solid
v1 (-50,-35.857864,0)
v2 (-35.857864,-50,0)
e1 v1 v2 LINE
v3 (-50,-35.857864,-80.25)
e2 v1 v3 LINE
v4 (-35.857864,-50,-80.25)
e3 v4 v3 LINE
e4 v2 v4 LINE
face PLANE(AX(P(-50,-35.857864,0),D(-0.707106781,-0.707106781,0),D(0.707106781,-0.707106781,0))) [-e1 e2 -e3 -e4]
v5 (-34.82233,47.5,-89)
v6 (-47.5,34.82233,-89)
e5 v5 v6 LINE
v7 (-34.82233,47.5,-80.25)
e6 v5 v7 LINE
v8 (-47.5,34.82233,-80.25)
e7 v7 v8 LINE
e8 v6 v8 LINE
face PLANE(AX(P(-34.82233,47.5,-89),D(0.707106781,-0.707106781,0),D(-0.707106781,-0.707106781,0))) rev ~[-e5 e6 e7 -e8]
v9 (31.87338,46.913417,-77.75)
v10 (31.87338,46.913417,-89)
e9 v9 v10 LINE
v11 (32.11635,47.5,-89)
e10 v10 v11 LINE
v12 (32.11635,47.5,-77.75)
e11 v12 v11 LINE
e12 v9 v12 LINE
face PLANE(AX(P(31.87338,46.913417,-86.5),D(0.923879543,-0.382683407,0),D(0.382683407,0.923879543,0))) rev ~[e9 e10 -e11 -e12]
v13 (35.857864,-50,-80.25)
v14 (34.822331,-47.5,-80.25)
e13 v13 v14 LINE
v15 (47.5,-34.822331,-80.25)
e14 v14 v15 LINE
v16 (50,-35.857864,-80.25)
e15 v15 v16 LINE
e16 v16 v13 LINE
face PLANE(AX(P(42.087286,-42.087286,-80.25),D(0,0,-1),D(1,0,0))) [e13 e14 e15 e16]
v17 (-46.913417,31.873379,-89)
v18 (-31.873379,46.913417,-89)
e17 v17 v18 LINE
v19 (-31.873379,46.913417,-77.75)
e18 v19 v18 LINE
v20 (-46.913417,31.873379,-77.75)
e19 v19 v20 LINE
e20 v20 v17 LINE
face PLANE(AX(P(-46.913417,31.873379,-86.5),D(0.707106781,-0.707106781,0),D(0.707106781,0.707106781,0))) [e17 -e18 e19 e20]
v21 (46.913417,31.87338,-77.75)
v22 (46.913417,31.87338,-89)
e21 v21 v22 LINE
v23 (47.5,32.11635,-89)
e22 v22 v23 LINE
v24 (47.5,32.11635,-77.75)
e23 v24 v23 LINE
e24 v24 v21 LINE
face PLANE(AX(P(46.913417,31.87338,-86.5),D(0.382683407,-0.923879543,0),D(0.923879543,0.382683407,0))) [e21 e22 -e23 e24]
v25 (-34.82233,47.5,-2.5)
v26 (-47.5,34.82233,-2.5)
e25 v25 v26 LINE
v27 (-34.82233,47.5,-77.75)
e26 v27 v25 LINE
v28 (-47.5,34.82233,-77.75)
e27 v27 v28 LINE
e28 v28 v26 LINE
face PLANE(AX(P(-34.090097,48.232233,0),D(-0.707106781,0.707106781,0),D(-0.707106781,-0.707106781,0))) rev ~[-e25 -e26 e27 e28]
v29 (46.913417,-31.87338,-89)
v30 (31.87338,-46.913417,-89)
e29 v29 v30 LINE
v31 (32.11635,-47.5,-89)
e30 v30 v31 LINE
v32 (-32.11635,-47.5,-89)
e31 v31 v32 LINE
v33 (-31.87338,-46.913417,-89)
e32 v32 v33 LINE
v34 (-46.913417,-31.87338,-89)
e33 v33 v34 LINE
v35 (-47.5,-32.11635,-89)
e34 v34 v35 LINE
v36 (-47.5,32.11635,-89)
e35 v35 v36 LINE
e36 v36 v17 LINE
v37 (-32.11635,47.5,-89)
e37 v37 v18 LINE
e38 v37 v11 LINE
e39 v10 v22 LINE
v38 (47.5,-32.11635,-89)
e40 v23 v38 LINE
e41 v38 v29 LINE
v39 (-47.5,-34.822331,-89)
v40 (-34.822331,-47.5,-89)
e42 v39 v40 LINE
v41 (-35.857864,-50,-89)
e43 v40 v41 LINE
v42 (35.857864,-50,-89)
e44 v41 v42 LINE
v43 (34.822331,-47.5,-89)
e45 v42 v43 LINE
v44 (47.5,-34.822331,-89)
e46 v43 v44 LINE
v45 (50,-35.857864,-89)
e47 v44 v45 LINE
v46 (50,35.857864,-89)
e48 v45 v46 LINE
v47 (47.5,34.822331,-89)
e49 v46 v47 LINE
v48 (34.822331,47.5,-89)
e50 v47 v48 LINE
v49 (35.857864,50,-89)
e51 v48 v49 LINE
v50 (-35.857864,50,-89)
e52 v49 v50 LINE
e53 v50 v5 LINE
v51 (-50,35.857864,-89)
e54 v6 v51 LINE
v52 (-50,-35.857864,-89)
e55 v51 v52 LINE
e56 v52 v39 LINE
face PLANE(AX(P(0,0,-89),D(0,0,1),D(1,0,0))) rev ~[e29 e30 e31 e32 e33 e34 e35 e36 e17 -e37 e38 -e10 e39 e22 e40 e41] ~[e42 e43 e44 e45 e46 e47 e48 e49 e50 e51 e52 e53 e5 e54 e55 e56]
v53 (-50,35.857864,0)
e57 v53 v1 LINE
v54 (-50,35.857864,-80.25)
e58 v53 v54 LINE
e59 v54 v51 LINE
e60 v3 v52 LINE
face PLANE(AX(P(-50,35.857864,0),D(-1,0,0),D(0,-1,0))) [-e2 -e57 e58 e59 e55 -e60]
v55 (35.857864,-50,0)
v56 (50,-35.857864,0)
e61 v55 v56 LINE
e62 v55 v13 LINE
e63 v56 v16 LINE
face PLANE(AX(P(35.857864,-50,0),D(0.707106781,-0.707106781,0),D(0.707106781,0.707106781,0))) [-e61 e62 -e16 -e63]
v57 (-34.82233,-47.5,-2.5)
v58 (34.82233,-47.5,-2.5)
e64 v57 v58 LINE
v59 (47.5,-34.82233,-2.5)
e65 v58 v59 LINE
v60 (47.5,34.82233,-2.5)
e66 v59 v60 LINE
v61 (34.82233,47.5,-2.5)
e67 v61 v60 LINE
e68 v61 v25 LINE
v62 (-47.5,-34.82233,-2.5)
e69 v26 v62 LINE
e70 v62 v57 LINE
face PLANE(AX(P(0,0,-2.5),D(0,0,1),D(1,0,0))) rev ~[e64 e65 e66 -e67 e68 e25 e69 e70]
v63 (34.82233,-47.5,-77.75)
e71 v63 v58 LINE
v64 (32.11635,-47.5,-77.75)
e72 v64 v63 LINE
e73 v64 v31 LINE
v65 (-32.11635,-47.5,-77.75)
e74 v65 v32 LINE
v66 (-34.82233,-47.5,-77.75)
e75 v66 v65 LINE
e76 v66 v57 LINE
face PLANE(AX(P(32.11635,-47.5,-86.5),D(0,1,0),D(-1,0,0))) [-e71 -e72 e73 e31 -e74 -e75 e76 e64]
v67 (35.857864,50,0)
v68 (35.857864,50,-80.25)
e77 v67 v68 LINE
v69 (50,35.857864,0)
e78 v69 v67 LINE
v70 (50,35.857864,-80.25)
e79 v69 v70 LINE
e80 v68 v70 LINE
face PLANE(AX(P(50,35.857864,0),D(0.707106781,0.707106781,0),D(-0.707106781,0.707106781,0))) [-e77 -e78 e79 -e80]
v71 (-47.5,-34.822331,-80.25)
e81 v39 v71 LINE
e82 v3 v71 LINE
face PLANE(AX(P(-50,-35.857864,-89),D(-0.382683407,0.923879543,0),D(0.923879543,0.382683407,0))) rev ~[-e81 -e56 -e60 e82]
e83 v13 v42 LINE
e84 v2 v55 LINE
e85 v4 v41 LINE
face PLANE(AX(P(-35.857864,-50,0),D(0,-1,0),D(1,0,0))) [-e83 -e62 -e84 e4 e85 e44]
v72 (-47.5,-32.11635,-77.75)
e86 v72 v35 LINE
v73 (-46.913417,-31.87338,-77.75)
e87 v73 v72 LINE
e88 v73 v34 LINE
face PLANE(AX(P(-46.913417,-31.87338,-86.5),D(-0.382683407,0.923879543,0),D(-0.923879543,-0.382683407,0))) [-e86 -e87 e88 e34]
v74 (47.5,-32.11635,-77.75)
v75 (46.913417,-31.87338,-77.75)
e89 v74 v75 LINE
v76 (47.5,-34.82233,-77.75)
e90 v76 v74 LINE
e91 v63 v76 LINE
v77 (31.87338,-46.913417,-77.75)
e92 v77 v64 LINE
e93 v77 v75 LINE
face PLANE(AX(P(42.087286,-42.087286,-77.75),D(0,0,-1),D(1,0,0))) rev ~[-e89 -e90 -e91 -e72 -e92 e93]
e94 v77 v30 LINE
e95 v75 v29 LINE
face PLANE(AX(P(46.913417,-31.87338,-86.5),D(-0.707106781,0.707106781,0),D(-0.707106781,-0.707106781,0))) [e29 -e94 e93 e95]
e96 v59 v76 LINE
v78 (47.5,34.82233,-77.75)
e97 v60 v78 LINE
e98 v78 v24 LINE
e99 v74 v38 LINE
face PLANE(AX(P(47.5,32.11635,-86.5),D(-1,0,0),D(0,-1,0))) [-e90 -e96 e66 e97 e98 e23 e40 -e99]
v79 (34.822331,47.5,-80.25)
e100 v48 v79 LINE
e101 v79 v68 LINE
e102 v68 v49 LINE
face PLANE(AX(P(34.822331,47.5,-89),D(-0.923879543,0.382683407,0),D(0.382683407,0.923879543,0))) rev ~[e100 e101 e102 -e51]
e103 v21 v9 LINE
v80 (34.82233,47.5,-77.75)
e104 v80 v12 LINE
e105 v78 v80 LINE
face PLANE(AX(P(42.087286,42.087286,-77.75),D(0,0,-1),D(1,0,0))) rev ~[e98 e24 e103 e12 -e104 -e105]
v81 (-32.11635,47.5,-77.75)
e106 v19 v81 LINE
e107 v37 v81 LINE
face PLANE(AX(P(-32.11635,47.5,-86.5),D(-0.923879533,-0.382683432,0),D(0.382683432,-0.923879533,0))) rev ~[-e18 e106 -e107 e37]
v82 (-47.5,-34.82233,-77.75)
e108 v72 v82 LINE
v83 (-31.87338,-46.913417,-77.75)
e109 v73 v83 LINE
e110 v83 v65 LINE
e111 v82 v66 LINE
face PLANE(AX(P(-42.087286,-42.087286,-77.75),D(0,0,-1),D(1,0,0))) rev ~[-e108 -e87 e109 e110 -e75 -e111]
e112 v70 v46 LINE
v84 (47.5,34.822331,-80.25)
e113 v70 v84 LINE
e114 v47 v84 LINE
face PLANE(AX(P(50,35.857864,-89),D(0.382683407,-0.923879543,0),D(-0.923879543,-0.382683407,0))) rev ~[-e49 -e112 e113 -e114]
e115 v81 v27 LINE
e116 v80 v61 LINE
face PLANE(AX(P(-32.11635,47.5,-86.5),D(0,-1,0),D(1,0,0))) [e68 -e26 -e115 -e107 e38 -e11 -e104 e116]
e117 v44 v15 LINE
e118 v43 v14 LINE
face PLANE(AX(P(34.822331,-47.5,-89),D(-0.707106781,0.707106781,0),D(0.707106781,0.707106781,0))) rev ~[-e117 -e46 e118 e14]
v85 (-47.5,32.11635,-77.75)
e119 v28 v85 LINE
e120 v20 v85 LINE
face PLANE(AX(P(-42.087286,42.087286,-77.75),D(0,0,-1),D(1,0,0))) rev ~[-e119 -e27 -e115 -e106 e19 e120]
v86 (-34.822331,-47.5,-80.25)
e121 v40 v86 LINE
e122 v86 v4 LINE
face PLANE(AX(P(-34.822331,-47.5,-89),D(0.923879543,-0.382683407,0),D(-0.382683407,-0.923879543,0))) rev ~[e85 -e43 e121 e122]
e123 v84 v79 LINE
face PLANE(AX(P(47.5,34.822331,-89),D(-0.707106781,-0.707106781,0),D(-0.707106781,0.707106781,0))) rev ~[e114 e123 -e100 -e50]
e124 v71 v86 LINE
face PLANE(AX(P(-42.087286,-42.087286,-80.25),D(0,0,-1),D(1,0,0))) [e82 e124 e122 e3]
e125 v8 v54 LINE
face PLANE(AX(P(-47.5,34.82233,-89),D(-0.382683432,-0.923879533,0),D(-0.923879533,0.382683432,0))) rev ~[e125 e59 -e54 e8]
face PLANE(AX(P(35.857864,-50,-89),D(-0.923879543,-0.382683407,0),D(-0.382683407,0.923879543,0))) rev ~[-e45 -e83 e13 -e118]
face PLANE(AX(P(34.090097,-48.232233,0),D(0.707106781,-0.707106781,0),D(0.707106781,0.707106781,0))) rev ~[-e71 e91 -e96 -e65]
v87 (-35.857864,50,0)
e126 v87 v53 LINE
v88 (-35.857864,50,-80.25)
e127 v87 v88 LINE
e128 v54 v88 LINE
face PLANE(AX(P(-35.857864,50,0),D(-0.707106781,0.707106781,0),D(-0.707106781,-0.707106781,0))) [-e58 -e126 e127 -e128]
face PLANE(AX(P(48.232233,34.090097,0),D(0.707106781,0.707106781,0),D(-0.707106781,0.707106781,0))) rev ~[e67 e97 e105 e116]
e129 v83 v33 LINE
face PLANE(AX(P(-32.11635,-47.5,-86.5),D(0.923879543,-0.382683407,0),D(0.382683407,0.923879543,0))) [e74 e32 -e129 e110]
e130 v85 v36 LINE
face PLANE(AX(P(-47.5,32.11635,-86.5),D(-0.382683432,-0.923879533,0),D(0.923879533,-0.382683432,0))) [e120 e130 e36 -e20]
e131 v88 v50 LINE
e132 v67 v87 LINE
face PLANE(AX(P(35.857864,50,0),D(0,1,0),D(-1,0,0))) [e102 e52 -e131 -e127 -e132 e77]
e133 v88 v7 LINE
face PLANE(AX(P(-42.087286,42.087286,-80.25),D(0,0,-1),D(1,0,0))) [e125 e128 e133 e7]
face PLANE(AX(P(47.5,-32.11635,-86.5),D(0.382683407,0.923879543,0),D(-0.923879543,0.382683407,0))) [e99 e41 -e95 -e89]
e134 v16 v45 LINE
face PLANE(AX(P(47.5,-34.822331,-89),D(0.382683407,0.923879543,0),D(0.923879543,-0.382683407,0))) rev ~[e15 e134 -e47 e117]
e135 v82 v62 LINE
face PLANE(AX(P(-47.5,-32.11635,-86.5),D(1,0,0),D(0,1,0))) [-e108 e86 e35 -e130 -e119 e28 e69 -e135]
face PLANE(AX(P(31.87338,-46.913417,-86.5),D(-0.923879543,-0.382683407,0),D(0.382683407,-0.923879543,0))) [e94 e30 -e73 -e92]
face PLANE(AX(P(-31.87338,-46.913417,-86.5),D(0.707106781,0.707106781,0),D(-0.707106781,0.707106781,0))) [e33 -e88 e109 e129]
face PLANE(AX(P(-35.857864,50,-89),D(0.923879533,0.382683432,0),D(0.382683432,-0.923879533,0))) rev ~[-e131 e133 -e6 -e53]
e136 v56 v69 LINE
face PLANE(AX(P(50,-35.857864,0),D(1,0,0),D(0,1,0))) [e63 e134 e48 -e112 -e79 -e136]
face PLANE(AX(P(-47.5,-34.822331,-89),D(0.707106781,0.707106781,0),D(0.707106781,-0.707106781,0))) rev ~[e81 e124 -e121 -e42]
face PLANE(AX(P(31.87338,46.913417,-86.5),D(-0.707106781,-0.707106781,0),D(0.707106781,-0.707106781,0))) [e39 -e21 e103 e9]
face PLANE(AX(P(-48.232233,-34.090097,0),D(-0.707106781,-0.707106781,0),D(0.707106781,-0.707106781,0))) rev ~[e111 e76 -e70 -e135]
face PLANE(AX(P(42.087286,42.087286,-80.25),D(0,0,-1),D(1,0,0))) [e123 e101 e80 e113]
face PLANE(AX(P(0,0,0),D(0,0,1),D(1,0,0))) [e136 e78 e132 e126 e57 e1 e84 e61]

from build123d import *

# Parameters (mm, degrees)
F1_DEPTH = 89
F3_DEPTH = 8.75
F4_T     = -2.5


# Not quite as in the source:
# - a shell that OpenCascade refuses in one call is made with other operations: the cavity is built on its own and cut out


with BuildPart() as f1:
    # F0 (on Top) → F1 (new body)
    with BuildSketch(Plane.XY):
        Polygon((50, 35.8578643763), (35.8578643763, 50), (-35.8578643763, 50), (-50, 35.8578643763), (-50, -35.8578643763), (-35.8578643763, -50), (35.8578643763, -50), (50, -35.8578643763), align=None)
    extrude(amount=-F1_DEPTH)

    # F2 (on face) → F3 (cut)
    with BuildSketch(Plane(origin=(0, 0, -89), x_dir=(1, 0, 0), z_dir=(0, 0, -1))):
        Polygon((-50, 35.8578643763), (-47.5, 34.8223305494), (-34.8223305494, 47.5), (-35.8578643763, 50), align=None)
        Polygon((-47.5, -34.8223304703), (-50, -35.8578643763), (-35.8578643763, -50), (-34.8223304703, -47.5), align=None)
        Polygon((50, 35.8578643763), (35.8578643763, 50), (34.8223305494, 47.5), (47.5, 34.8223305494), align=None)
        Polygon((34.8223305494, -47.5), (35.8578643763, -50), (50, -35.8578643763), (47.5, -34.8223305494), align=None)
    extrude(amount=-F3_DEPTH, mode=Mode.SUBTRACT)

    # F4: a shell. OpenCascade refuses it in one call, so the cavity is built on its own and cut out:
    # the body offset inwards by the wall thickness, plus a prism from it out through each open face.
    f4_core = offset(f1.part, amount=F4_T, kind=Kind.INTERSECTION, mode=Mode.PRIVATE)
    f4_exits = [f4_core.faces().sort_by_distance(p)[0] for p in [
        (0, 0, -86.5),
    ]]
    add(f4_core, mode=Mode.SUBTRACT)
    extrude(f4_exits, amount=-F4_T, mode=Mode.SUBTRACT)


solid = f1.part
